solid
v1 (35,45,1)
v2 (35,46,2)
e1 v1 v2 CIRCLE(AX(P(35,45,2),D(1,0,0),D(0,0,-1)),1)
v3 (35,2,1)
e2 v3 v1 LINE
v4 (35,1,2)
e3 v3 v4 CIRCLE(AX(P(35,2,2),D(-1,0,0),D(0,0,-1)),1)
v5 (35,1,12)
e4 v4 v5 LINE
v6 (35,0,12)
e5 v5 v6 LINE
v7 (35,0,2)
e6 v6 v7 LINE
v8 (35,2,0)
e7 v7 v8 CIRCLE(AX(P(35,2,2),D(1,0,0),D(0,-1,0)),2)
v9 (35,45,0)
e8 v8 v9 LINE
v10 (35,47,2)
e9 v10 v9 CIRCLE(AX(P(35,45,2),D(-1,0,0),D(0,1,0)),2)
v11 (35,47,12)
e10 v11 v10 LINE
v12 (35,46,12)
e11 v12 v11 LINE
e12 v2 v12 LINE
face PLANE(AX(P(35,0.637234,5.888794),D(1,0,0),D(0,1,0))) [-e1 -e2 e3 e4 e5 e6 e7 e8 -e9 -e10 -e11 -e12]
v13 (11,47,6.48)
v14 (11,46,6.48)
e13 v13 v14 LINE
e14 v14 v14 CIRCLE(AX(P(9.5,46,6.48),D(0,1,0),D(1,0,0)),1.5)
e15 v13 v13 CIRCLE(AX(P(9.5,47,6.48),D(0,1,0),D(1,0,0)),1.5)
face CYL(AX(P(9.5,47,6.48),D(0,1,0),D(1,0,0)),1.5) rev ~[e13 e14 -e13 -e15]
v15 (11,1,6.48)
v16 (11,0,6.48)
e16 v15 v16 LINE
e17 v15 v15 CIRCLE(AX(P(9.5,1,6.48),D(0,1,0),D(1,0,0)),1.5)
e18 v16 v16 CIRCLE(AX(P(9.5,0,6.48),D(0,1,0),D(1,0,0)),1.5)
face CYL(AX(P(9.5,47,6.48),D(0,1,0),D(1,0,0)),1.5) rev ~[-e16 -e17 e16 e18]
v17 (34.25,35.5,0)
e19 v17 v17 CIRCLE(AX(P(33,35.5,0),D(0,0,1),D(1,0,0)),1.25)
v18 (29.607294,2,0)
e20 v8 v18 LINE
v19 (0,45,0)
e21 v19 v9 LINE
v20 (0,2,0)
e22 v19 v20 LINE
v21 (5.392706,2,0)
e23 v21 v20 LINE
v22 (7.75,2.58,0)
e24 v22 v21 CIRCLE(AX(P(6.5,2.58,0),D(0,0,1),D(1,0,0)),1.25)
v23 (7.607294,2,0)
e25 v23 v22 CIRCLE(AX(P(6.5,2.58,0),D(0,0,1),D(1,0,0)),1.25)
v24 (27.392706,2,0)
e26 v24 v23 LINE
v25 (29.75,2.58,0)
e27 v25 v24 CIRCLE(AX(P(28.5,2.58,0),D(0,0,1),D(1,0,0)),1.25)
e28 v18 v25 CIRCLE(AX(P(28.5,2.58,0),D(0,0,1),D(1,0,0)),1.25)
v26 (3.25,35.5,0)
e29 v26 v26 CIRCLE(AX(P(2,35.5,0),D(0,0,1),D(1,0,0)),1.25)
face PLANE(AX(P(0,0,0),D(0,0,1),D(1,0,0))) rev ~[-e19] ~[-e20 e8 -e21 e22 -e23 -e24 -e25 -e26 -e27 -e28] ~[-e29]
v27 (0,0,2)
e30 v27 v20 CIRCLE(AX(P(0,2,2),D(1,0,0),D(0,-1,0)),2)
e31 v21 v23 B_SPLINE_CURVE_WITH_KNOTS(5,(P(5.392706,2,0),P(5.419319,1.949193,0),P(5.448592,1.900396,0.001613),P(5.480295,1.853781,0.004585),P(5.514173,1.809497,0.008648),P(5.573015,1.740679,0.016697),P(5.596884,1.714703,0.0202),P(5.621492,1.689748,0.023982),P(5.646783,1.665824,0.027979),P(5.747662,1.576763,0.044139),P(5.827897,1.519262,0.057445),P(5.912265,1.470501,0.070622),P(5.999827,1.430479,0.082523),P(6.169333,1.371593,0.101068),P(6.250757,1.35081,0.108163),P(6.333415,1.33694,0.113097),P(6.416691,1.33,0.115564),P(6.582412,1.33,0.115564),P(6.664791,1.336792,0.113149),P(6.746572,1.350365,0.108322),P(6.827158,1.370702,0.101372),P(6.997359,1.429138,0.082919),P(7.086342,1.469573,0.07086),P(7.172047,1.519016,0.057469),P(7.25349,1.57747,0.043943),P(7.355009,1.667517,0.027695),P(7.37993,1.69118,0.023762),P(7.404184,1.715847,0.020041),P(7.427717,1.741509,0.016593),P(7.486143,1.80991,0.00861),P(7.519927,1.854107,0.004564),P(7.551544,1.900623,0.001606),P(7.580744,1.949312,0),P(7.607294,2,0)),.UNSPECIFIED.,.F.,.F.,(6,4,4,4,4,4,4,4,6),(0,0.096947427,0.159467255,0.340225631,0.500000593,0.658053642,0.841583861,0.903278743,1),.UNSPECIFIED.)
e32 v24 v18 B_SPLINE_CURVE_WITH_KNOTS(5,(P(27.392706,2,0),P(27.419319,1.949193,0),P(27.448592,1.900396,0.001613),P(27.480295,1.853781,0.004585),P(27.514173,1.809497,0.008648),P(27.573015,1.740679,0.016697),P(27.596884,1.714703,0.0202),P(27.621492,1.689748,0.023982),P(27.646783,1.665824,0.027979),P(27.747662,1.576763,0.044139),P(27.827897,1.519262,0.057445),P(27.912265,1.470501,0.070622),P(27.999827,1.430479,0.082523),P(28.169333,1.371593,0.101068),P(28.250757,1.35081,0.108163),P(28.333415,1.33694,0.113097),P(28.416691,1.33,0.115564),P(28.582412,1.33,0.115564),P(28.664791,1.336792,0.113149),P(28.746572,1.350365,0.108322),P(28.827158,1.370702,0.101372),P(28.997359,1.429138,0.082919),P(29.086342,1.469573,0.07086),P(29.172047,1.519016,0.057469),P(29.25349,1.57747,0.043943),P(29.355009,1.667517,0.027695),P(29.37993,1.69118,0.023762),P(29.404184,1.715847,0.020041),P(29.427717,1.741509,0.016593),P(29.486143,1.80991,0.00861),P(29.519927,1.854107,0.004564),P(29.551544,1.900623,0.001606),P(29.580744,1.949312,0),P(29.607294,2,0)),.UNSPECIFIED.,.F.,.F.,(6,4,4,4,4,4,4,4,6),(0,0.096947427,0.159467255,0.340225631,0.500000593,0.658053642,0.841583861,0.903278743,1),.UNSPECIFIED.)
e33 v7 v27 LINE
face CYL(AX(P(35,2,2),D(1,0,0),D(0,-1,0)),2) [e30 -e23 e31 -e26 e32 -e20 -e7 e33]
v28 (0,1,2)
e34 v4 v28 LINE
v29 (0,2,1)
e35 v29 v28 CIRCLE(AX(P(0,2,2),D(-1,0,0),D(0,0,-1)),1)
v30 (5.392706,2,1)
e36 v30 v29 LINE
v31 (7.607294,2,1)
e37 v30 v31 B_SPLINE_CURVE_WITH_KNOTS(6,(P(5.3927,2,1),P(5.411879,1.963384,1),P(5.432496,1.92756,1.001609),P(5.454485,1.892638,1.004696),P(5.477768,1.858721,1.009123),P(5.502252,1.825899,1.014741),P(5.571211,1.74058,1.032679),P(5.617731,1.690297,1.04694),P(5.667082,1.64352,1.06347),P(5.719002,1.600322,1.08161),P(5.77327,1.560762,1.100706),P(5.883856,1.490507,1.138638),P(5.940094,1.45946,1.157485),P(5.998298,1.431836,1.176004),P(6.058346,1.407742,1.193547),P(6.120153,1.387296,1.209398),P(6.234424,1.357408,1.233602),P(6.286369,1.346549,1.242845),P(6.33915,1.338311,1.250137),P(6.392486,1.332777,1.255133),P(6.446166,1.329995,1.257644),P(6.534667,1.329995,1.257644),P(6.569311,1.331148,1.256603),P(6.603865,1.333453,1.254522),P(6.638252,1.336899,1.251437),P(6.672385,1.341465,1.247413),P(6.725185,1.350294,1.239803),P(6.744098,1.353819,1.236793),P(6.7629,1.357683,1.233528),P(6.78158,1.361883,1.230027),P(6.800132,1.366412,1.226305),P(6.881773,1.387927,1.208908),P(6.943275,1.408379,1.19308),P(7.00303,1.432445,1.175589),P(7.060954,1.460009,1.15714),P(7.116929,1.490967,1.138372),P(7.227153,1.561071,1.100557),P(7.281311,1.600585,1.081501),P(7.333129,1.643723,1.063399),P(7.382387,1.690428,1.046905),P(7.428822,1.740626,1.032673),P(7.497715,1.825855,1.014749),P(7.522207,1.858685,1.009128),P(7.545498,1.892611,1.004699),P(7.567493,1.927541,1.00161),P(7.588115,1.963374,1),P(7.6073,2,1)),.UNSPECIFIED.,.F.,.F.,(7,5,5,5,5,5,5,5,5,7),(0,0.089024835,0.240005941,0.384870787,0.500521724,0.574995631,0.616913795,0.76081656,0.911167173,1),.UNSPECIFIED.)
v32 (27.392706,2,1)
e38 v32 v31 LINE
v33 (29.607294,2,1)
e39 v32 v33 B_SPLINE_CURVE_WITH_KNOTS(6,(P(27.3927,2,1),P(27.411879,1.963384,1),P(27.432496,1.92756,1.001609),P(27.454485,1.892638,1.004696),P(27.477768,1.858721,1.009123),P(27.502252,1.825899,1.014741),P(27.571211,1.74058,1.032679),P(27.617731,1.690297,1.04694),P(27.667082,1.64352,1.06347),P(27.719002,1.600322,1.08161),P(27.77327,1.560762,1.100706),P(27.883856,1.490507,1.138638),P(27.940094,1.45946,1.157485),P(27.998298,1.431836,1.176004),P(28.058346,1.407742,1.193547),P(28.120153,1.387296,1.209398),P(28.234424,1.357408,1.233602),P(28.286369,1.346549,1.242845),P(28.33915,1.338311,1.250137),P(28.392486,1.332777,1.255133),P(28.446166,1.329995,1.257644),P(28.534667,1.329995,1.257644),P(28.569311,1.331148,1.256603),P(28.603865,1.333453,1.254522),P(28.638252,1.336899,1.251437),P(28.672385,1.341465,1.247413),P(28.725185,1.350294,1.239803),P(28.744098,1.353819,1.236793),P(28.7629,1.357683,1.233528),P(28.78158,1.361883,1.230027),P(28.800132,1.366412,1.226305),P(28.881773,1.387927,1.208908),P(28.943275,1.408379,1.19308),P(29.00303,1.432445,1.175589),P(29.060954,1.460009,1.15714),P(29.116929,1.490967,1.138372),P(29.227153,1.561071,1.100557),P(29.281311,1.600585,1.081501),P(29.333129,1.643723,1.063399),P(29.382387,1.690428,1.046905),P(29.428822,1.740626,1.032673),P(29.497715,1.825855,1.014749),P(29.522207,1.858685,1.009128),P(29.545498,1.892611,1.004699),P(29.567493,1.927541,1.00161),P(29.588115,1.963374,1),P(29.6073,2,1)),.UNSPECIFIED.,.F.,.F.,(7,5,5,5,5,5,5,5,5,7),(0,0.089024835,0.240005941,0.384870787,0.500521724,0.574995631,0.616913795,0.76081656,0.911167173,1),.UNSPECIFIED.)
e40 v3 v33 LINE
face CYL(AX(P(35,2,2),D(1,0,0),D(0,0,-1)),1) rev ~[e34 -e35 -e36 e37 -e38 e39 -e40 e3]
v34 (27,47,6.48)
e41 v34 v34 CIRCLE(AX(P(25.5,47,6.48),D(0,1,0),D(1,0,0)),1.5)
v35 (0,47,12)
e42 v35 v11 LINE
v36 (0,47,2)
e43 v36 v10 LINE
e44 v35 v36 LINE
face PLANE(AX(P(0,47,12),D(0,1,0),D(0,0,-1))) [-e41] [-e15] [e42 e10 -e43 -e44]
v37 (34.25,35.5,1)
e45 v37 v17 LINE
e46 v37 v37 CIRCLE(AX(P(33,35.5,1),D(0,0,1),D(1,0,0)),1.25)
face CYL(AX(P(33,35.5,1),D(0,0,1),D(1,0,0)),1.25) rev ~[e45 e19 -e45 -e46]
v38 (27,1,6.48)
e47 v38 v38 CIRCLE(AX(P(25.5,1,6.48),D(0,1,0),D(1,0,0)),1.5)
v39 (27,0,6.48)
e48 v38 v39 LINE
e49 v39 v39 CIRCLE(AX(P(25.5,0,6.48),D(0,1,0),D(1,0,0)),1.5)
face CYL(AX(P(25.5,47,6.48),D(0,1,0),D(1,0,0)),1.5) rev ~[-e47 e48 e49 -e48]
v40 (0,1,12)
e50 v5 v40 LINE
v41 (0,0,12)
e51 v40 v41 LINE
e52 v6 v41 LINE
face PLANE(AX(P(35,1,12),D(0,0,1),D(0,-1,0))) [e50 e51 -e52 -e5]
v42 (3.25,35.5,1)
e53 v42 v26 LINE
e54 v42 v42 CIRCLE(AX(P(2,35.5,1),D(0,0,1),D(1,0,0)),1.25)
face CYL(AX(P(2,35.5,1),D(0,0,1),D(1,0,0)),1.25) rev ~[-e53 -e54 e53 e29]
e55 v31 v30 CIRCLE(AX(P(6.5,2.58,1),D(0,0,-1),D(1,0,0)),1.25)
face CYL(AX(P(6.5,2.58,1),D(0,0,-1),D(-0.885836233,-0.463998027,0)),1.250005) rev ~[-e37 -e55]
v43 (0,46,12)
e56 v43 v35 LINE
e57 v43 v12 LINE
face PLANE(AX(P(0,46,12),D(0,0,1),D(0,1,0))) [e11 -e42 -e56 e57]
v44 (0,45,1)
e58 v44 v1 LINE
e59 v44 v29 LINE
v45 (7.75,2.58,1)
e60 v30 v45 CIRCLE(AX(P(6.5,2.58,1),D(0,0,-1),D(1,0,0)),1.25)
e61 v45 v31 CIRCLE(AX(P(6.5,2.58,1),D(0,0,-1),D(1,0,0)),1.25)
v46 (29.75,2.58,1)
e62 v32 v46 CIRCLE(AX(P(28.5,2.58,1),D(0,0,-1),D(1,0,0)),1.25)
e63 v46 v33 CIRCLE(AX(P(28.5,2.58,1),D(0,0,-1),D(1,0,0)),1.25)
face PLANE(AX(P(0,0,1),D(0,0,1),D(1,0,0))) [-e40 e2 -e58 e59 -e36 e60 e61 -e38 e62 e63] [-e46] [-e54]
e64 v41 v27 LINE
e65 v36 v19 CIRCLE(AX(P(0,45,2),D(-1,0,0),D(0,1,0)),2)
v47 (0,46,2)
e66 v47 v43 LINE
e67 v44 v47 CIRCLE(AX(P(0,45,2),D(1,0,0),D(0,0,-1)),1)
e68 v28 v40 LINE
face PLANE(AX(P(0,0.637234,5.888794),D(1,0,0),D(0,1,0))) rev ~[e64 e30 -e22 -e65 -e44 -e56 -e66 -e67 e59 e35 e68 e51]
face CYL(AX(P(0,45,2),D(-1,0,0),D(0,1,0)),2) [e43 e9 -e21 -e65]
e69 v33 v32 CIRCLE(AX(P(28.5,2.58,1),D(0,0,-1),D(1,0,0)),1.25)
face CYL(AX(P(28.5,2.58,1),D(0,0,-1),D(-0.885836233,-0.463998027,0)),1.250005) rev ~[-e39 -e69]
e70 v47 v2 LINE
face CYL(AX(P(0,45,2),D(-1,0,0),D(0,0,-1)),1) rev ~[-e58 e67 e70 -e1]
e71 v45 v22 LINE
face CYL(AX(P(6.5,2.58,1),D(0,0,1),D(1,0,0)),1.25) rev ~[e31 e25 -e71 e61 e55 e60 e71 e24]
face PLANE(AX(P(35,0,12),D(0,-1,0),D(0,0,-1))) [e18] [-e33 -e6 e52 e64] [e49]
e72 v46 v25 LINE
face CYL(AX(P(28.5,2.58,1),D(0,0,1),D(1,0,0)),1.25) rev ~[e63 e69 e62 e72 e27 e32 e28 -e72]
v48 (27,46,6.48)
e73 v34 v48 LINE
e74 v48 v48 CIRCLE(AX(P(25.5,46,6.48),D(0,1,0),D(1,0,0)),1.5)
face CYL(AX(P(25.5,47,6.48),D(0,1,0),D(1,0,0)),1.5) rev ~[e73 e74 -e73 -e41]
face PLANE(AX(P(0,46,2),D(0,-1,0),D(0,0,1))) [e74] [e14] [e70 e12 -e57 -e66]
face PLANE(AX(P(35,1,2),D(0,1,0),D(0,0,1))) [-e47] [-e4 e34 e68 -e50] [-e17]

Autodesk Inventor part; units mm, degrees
ref_plane "YZ Plane" through (0, 0, 0) normal (1, 0, 0) x (0, 1, 0)
ref_plane "XZ Plane" through (0, 0, 0) normal (0, 1, 0) x (-1, 0, 0)
ref_plane "XY Plane" through (0, 0, 0) normal (0, 0, 1) x (1, 0, 0)
sketch "Sketch12" plane through (0, 0, 0) normal (0, 0, 1) x (1, 0, 0)
  line L0 (0, 0) -> (35, 0)
  line L1 (35, 0) -> (35, 47)
  line L2 (35, 47) -> (0, 47)
  line L3 (0, 47) -> (0, 0)
  dimension "d49" = 35
  dimension "d50" = 47
extrude "Plate4" add sketch "Sketch12" along normal blind 1
sketch "Sketch13" plane through (0, 0, 0) normal (-1, 0, 0) x (0, 0, 1)
  point P0 (0, 0)
sketch "Sketch14" plane through (0, 46, 0) normal (0, 1, 0) x (-1, 0, 0)
  line L0 (-35, 0) -> (0, 0)
  line L1 (0, 0) -> (0, 12)
  line L2 (0, 12) -> (-35, 12)
  line L3 (-35, 12) -> (-35, 0)
edge flange "Flange3" height 12 angle 90 thickness 1 bend radius 1 thickness toward (0, 1, 0) relief tear relief width 1 relief depth 0.5 edges at (17.5, 47, 1) wall of the first edge with corners at (35, 46, 0) (0, 46, 0) (0, 46, 12) (35, 46, 12)
bend "Bend3"
corner "Corner3"
sketch "Sketch15" plane through (35, 1, 0) normal (0, -1, 0) x (1, 0, 0)
  line L0 (-35, 0) -> (0, 0)
  line L1 (0, 0) -> (0, 12)
  line L2 (0, 12) -> (-35, 12)
  line L3 (-35, 12) -> (-35, 0)
edge flange "Flange4" height 12 angle 90 thickness 1 bend radius 1 thickness toward (0, -1, 0) relief tear relief width 1 relief depth 0.5 edges at (17.5, 0, 1) wall of the first edge with corners at (0, 1, 0) (35, 1, 0) (35, 1, 12) (0, 1, 12)
bend "Bend4"
corner "Corner4"
sketch "Sketch16" plane through (0, 47, 12) normal (0, 1, 0) x (1, 0, 0)
  line L0 (0, 11) -> (0, 10) projected
  line L1 (0, 10) -> (0, 5.52) construction
  line L2 (0, 10) -> (0, 0) projected
  line L3 (0, 5.52) -> (9.5, 5.52) construction
  circle A0 centre (9.5, 5.52) radius 1.5
  line L4 (35, 10) -> (35, 0) projected
  line L5 (35, 10) -> (35, 5.52)
  line L6 (35, 5.52) -> (25.5, 5.52) construction
  circle A1 centre (25.5, 5.52) radius 1.5
  point P0 (0, 12)
  dimension "d72" = 4.48
  dimension "d73" = 9.5
  dimension "d74" = 3
  dimension "d75" = 4.48
  dimension "d76" = 9.5
  dimension "d77" = 3
extrude "Extrusion4" cut sketch "Sketch16" against normal through all
sketch "Sketch17" plane through (0, 0, 1) normal (0, 0, 1) x (1, 0, 0)
  line L0 (35, 45) -> (0, 45) construction
  line L1 (0, 45) -> (2, 45) construction
  line L2 (2, 45) -> (2, 35.5) construction
  line L3 (35, 45) -> (33, 45) construction
  line L4 (33, 45) -> (33, 35.5) construction
  circle A0 centre (2, 35.5) radius 1.25
  circle A1 centre (33, 35.5) radius 1.25
  point P0 (0, 0)
  dimension "d80" = 2
  dimension "d81" = 9.5
  dimension "d82" = 2
  dimension "d83" = 2.5
  dimension "d84" = 9.5
extrude "Extrusion5" cut sketch "Sketch17" against normal blind 10
sketch "Sketch18" plane through (0, 0, 1) normal (0, 0, 1) x (1, 0, 0)
  line L0 (0, 2) -> (0, 45) projected
  line L1 (0, 2) -> (6.5, 2) construction
  line L2 (6.5, 2) -> (6.5, 2.58) construction
  circle A0 centre (6.5, 2.58) radius 1.25
  line L3 (35, 45) -> (35, 2) projected
  line L4 (35, 2) -> (28.5, 2) construction
  line L5 (35, 2) -> (0, 2) projected
  line L6 (28.5, 2) -> (28.5, 2.58) construction
  circle A1 centre (28.5, 2.58) radius 1.25
  point P0 (0, 0)
  dimension "d87" = 6.5
  dimension "d88" = 0.58
  dimension "d89" = 2.5
  dimension "d90" = 6.5
  dimension "d91" = 0.58
  dimension "d92" = 2.5
extrude "Extrusion6" cut sketch "Sketch18" against normal blind 10
sketch "Sketch20" plane through (0, 0, 1) normal (0, 0, 1) x (1, 0, 0)
  arc A0 (7.6073, 2) -> (5.3927, 2) centre (6.5, 2.58) ccw projected
  arc A1 (5.3927, 2) -> (7.6073, 2) centre (6.5, 2.58) ccw projected
  circle A2 centre (6.5, 2.58) radius 1.25
  arc A3 (29.6073, 2) -> (27.3927, 2) centre (28.5, 2.58) ccw projected
  arc A4 (27.3927, 2) -> (29.6073, 2) centre (28.5, 2.58) ccw projected
  circle A5 centre (28.5, 2.58) radius 1.25
  point P0 (0, 0)
extrude "Extrusion7" cut sketch "Sketch20" along normal through all
equation "\"d51\" = Thickness"
equation "\"d52\" = BendReliefWidth"
equation "\"d53\" = BendReliefDepth"
equation "\"d54\" = MinimumRemnant"
equation "\"d55\" = TransitionRadius"
equation "\"d58\" = BendRadius"
equation "\"d59\" = CornerReliefSize"
equation "\"d60\" = GapSize"
equation "\"d61\" = JacobiRadiusSize"
equation "\"d62\" = BendReliefWidth"
equation "\"d63\" = BendReliefDepth"
equation "\"d64\" = MinimumRemnant"
equation "\"d65\" = TransitionRadius"
equation "\"d68\" = BendRadius"
equation "\"d69\" = CornerReliefSize"
equation "\"d70\" = GapSize"
equation "\"d71\" = JacobiRadiusSize"
equation "\"BendRadius\" = Thickness"
equation "\"BendReliefWidth\" = Thickness"
equation "\"BendReliefDepth\" = 0.5 * Thickness"
equation "\"CornerReliefSize\" = 4 * Thickness"
equation "\"MinimumRemnant\" = 2 * Thickness"
equation "\"TransitionRadius\" = BendRadius"
equation "\"JacobiRadiusSize\" = BendRadius"
equation "\"GapSize\" = Thickness"
equation "\"Thickness\" = 1"
properties part number "Suportmotor"
